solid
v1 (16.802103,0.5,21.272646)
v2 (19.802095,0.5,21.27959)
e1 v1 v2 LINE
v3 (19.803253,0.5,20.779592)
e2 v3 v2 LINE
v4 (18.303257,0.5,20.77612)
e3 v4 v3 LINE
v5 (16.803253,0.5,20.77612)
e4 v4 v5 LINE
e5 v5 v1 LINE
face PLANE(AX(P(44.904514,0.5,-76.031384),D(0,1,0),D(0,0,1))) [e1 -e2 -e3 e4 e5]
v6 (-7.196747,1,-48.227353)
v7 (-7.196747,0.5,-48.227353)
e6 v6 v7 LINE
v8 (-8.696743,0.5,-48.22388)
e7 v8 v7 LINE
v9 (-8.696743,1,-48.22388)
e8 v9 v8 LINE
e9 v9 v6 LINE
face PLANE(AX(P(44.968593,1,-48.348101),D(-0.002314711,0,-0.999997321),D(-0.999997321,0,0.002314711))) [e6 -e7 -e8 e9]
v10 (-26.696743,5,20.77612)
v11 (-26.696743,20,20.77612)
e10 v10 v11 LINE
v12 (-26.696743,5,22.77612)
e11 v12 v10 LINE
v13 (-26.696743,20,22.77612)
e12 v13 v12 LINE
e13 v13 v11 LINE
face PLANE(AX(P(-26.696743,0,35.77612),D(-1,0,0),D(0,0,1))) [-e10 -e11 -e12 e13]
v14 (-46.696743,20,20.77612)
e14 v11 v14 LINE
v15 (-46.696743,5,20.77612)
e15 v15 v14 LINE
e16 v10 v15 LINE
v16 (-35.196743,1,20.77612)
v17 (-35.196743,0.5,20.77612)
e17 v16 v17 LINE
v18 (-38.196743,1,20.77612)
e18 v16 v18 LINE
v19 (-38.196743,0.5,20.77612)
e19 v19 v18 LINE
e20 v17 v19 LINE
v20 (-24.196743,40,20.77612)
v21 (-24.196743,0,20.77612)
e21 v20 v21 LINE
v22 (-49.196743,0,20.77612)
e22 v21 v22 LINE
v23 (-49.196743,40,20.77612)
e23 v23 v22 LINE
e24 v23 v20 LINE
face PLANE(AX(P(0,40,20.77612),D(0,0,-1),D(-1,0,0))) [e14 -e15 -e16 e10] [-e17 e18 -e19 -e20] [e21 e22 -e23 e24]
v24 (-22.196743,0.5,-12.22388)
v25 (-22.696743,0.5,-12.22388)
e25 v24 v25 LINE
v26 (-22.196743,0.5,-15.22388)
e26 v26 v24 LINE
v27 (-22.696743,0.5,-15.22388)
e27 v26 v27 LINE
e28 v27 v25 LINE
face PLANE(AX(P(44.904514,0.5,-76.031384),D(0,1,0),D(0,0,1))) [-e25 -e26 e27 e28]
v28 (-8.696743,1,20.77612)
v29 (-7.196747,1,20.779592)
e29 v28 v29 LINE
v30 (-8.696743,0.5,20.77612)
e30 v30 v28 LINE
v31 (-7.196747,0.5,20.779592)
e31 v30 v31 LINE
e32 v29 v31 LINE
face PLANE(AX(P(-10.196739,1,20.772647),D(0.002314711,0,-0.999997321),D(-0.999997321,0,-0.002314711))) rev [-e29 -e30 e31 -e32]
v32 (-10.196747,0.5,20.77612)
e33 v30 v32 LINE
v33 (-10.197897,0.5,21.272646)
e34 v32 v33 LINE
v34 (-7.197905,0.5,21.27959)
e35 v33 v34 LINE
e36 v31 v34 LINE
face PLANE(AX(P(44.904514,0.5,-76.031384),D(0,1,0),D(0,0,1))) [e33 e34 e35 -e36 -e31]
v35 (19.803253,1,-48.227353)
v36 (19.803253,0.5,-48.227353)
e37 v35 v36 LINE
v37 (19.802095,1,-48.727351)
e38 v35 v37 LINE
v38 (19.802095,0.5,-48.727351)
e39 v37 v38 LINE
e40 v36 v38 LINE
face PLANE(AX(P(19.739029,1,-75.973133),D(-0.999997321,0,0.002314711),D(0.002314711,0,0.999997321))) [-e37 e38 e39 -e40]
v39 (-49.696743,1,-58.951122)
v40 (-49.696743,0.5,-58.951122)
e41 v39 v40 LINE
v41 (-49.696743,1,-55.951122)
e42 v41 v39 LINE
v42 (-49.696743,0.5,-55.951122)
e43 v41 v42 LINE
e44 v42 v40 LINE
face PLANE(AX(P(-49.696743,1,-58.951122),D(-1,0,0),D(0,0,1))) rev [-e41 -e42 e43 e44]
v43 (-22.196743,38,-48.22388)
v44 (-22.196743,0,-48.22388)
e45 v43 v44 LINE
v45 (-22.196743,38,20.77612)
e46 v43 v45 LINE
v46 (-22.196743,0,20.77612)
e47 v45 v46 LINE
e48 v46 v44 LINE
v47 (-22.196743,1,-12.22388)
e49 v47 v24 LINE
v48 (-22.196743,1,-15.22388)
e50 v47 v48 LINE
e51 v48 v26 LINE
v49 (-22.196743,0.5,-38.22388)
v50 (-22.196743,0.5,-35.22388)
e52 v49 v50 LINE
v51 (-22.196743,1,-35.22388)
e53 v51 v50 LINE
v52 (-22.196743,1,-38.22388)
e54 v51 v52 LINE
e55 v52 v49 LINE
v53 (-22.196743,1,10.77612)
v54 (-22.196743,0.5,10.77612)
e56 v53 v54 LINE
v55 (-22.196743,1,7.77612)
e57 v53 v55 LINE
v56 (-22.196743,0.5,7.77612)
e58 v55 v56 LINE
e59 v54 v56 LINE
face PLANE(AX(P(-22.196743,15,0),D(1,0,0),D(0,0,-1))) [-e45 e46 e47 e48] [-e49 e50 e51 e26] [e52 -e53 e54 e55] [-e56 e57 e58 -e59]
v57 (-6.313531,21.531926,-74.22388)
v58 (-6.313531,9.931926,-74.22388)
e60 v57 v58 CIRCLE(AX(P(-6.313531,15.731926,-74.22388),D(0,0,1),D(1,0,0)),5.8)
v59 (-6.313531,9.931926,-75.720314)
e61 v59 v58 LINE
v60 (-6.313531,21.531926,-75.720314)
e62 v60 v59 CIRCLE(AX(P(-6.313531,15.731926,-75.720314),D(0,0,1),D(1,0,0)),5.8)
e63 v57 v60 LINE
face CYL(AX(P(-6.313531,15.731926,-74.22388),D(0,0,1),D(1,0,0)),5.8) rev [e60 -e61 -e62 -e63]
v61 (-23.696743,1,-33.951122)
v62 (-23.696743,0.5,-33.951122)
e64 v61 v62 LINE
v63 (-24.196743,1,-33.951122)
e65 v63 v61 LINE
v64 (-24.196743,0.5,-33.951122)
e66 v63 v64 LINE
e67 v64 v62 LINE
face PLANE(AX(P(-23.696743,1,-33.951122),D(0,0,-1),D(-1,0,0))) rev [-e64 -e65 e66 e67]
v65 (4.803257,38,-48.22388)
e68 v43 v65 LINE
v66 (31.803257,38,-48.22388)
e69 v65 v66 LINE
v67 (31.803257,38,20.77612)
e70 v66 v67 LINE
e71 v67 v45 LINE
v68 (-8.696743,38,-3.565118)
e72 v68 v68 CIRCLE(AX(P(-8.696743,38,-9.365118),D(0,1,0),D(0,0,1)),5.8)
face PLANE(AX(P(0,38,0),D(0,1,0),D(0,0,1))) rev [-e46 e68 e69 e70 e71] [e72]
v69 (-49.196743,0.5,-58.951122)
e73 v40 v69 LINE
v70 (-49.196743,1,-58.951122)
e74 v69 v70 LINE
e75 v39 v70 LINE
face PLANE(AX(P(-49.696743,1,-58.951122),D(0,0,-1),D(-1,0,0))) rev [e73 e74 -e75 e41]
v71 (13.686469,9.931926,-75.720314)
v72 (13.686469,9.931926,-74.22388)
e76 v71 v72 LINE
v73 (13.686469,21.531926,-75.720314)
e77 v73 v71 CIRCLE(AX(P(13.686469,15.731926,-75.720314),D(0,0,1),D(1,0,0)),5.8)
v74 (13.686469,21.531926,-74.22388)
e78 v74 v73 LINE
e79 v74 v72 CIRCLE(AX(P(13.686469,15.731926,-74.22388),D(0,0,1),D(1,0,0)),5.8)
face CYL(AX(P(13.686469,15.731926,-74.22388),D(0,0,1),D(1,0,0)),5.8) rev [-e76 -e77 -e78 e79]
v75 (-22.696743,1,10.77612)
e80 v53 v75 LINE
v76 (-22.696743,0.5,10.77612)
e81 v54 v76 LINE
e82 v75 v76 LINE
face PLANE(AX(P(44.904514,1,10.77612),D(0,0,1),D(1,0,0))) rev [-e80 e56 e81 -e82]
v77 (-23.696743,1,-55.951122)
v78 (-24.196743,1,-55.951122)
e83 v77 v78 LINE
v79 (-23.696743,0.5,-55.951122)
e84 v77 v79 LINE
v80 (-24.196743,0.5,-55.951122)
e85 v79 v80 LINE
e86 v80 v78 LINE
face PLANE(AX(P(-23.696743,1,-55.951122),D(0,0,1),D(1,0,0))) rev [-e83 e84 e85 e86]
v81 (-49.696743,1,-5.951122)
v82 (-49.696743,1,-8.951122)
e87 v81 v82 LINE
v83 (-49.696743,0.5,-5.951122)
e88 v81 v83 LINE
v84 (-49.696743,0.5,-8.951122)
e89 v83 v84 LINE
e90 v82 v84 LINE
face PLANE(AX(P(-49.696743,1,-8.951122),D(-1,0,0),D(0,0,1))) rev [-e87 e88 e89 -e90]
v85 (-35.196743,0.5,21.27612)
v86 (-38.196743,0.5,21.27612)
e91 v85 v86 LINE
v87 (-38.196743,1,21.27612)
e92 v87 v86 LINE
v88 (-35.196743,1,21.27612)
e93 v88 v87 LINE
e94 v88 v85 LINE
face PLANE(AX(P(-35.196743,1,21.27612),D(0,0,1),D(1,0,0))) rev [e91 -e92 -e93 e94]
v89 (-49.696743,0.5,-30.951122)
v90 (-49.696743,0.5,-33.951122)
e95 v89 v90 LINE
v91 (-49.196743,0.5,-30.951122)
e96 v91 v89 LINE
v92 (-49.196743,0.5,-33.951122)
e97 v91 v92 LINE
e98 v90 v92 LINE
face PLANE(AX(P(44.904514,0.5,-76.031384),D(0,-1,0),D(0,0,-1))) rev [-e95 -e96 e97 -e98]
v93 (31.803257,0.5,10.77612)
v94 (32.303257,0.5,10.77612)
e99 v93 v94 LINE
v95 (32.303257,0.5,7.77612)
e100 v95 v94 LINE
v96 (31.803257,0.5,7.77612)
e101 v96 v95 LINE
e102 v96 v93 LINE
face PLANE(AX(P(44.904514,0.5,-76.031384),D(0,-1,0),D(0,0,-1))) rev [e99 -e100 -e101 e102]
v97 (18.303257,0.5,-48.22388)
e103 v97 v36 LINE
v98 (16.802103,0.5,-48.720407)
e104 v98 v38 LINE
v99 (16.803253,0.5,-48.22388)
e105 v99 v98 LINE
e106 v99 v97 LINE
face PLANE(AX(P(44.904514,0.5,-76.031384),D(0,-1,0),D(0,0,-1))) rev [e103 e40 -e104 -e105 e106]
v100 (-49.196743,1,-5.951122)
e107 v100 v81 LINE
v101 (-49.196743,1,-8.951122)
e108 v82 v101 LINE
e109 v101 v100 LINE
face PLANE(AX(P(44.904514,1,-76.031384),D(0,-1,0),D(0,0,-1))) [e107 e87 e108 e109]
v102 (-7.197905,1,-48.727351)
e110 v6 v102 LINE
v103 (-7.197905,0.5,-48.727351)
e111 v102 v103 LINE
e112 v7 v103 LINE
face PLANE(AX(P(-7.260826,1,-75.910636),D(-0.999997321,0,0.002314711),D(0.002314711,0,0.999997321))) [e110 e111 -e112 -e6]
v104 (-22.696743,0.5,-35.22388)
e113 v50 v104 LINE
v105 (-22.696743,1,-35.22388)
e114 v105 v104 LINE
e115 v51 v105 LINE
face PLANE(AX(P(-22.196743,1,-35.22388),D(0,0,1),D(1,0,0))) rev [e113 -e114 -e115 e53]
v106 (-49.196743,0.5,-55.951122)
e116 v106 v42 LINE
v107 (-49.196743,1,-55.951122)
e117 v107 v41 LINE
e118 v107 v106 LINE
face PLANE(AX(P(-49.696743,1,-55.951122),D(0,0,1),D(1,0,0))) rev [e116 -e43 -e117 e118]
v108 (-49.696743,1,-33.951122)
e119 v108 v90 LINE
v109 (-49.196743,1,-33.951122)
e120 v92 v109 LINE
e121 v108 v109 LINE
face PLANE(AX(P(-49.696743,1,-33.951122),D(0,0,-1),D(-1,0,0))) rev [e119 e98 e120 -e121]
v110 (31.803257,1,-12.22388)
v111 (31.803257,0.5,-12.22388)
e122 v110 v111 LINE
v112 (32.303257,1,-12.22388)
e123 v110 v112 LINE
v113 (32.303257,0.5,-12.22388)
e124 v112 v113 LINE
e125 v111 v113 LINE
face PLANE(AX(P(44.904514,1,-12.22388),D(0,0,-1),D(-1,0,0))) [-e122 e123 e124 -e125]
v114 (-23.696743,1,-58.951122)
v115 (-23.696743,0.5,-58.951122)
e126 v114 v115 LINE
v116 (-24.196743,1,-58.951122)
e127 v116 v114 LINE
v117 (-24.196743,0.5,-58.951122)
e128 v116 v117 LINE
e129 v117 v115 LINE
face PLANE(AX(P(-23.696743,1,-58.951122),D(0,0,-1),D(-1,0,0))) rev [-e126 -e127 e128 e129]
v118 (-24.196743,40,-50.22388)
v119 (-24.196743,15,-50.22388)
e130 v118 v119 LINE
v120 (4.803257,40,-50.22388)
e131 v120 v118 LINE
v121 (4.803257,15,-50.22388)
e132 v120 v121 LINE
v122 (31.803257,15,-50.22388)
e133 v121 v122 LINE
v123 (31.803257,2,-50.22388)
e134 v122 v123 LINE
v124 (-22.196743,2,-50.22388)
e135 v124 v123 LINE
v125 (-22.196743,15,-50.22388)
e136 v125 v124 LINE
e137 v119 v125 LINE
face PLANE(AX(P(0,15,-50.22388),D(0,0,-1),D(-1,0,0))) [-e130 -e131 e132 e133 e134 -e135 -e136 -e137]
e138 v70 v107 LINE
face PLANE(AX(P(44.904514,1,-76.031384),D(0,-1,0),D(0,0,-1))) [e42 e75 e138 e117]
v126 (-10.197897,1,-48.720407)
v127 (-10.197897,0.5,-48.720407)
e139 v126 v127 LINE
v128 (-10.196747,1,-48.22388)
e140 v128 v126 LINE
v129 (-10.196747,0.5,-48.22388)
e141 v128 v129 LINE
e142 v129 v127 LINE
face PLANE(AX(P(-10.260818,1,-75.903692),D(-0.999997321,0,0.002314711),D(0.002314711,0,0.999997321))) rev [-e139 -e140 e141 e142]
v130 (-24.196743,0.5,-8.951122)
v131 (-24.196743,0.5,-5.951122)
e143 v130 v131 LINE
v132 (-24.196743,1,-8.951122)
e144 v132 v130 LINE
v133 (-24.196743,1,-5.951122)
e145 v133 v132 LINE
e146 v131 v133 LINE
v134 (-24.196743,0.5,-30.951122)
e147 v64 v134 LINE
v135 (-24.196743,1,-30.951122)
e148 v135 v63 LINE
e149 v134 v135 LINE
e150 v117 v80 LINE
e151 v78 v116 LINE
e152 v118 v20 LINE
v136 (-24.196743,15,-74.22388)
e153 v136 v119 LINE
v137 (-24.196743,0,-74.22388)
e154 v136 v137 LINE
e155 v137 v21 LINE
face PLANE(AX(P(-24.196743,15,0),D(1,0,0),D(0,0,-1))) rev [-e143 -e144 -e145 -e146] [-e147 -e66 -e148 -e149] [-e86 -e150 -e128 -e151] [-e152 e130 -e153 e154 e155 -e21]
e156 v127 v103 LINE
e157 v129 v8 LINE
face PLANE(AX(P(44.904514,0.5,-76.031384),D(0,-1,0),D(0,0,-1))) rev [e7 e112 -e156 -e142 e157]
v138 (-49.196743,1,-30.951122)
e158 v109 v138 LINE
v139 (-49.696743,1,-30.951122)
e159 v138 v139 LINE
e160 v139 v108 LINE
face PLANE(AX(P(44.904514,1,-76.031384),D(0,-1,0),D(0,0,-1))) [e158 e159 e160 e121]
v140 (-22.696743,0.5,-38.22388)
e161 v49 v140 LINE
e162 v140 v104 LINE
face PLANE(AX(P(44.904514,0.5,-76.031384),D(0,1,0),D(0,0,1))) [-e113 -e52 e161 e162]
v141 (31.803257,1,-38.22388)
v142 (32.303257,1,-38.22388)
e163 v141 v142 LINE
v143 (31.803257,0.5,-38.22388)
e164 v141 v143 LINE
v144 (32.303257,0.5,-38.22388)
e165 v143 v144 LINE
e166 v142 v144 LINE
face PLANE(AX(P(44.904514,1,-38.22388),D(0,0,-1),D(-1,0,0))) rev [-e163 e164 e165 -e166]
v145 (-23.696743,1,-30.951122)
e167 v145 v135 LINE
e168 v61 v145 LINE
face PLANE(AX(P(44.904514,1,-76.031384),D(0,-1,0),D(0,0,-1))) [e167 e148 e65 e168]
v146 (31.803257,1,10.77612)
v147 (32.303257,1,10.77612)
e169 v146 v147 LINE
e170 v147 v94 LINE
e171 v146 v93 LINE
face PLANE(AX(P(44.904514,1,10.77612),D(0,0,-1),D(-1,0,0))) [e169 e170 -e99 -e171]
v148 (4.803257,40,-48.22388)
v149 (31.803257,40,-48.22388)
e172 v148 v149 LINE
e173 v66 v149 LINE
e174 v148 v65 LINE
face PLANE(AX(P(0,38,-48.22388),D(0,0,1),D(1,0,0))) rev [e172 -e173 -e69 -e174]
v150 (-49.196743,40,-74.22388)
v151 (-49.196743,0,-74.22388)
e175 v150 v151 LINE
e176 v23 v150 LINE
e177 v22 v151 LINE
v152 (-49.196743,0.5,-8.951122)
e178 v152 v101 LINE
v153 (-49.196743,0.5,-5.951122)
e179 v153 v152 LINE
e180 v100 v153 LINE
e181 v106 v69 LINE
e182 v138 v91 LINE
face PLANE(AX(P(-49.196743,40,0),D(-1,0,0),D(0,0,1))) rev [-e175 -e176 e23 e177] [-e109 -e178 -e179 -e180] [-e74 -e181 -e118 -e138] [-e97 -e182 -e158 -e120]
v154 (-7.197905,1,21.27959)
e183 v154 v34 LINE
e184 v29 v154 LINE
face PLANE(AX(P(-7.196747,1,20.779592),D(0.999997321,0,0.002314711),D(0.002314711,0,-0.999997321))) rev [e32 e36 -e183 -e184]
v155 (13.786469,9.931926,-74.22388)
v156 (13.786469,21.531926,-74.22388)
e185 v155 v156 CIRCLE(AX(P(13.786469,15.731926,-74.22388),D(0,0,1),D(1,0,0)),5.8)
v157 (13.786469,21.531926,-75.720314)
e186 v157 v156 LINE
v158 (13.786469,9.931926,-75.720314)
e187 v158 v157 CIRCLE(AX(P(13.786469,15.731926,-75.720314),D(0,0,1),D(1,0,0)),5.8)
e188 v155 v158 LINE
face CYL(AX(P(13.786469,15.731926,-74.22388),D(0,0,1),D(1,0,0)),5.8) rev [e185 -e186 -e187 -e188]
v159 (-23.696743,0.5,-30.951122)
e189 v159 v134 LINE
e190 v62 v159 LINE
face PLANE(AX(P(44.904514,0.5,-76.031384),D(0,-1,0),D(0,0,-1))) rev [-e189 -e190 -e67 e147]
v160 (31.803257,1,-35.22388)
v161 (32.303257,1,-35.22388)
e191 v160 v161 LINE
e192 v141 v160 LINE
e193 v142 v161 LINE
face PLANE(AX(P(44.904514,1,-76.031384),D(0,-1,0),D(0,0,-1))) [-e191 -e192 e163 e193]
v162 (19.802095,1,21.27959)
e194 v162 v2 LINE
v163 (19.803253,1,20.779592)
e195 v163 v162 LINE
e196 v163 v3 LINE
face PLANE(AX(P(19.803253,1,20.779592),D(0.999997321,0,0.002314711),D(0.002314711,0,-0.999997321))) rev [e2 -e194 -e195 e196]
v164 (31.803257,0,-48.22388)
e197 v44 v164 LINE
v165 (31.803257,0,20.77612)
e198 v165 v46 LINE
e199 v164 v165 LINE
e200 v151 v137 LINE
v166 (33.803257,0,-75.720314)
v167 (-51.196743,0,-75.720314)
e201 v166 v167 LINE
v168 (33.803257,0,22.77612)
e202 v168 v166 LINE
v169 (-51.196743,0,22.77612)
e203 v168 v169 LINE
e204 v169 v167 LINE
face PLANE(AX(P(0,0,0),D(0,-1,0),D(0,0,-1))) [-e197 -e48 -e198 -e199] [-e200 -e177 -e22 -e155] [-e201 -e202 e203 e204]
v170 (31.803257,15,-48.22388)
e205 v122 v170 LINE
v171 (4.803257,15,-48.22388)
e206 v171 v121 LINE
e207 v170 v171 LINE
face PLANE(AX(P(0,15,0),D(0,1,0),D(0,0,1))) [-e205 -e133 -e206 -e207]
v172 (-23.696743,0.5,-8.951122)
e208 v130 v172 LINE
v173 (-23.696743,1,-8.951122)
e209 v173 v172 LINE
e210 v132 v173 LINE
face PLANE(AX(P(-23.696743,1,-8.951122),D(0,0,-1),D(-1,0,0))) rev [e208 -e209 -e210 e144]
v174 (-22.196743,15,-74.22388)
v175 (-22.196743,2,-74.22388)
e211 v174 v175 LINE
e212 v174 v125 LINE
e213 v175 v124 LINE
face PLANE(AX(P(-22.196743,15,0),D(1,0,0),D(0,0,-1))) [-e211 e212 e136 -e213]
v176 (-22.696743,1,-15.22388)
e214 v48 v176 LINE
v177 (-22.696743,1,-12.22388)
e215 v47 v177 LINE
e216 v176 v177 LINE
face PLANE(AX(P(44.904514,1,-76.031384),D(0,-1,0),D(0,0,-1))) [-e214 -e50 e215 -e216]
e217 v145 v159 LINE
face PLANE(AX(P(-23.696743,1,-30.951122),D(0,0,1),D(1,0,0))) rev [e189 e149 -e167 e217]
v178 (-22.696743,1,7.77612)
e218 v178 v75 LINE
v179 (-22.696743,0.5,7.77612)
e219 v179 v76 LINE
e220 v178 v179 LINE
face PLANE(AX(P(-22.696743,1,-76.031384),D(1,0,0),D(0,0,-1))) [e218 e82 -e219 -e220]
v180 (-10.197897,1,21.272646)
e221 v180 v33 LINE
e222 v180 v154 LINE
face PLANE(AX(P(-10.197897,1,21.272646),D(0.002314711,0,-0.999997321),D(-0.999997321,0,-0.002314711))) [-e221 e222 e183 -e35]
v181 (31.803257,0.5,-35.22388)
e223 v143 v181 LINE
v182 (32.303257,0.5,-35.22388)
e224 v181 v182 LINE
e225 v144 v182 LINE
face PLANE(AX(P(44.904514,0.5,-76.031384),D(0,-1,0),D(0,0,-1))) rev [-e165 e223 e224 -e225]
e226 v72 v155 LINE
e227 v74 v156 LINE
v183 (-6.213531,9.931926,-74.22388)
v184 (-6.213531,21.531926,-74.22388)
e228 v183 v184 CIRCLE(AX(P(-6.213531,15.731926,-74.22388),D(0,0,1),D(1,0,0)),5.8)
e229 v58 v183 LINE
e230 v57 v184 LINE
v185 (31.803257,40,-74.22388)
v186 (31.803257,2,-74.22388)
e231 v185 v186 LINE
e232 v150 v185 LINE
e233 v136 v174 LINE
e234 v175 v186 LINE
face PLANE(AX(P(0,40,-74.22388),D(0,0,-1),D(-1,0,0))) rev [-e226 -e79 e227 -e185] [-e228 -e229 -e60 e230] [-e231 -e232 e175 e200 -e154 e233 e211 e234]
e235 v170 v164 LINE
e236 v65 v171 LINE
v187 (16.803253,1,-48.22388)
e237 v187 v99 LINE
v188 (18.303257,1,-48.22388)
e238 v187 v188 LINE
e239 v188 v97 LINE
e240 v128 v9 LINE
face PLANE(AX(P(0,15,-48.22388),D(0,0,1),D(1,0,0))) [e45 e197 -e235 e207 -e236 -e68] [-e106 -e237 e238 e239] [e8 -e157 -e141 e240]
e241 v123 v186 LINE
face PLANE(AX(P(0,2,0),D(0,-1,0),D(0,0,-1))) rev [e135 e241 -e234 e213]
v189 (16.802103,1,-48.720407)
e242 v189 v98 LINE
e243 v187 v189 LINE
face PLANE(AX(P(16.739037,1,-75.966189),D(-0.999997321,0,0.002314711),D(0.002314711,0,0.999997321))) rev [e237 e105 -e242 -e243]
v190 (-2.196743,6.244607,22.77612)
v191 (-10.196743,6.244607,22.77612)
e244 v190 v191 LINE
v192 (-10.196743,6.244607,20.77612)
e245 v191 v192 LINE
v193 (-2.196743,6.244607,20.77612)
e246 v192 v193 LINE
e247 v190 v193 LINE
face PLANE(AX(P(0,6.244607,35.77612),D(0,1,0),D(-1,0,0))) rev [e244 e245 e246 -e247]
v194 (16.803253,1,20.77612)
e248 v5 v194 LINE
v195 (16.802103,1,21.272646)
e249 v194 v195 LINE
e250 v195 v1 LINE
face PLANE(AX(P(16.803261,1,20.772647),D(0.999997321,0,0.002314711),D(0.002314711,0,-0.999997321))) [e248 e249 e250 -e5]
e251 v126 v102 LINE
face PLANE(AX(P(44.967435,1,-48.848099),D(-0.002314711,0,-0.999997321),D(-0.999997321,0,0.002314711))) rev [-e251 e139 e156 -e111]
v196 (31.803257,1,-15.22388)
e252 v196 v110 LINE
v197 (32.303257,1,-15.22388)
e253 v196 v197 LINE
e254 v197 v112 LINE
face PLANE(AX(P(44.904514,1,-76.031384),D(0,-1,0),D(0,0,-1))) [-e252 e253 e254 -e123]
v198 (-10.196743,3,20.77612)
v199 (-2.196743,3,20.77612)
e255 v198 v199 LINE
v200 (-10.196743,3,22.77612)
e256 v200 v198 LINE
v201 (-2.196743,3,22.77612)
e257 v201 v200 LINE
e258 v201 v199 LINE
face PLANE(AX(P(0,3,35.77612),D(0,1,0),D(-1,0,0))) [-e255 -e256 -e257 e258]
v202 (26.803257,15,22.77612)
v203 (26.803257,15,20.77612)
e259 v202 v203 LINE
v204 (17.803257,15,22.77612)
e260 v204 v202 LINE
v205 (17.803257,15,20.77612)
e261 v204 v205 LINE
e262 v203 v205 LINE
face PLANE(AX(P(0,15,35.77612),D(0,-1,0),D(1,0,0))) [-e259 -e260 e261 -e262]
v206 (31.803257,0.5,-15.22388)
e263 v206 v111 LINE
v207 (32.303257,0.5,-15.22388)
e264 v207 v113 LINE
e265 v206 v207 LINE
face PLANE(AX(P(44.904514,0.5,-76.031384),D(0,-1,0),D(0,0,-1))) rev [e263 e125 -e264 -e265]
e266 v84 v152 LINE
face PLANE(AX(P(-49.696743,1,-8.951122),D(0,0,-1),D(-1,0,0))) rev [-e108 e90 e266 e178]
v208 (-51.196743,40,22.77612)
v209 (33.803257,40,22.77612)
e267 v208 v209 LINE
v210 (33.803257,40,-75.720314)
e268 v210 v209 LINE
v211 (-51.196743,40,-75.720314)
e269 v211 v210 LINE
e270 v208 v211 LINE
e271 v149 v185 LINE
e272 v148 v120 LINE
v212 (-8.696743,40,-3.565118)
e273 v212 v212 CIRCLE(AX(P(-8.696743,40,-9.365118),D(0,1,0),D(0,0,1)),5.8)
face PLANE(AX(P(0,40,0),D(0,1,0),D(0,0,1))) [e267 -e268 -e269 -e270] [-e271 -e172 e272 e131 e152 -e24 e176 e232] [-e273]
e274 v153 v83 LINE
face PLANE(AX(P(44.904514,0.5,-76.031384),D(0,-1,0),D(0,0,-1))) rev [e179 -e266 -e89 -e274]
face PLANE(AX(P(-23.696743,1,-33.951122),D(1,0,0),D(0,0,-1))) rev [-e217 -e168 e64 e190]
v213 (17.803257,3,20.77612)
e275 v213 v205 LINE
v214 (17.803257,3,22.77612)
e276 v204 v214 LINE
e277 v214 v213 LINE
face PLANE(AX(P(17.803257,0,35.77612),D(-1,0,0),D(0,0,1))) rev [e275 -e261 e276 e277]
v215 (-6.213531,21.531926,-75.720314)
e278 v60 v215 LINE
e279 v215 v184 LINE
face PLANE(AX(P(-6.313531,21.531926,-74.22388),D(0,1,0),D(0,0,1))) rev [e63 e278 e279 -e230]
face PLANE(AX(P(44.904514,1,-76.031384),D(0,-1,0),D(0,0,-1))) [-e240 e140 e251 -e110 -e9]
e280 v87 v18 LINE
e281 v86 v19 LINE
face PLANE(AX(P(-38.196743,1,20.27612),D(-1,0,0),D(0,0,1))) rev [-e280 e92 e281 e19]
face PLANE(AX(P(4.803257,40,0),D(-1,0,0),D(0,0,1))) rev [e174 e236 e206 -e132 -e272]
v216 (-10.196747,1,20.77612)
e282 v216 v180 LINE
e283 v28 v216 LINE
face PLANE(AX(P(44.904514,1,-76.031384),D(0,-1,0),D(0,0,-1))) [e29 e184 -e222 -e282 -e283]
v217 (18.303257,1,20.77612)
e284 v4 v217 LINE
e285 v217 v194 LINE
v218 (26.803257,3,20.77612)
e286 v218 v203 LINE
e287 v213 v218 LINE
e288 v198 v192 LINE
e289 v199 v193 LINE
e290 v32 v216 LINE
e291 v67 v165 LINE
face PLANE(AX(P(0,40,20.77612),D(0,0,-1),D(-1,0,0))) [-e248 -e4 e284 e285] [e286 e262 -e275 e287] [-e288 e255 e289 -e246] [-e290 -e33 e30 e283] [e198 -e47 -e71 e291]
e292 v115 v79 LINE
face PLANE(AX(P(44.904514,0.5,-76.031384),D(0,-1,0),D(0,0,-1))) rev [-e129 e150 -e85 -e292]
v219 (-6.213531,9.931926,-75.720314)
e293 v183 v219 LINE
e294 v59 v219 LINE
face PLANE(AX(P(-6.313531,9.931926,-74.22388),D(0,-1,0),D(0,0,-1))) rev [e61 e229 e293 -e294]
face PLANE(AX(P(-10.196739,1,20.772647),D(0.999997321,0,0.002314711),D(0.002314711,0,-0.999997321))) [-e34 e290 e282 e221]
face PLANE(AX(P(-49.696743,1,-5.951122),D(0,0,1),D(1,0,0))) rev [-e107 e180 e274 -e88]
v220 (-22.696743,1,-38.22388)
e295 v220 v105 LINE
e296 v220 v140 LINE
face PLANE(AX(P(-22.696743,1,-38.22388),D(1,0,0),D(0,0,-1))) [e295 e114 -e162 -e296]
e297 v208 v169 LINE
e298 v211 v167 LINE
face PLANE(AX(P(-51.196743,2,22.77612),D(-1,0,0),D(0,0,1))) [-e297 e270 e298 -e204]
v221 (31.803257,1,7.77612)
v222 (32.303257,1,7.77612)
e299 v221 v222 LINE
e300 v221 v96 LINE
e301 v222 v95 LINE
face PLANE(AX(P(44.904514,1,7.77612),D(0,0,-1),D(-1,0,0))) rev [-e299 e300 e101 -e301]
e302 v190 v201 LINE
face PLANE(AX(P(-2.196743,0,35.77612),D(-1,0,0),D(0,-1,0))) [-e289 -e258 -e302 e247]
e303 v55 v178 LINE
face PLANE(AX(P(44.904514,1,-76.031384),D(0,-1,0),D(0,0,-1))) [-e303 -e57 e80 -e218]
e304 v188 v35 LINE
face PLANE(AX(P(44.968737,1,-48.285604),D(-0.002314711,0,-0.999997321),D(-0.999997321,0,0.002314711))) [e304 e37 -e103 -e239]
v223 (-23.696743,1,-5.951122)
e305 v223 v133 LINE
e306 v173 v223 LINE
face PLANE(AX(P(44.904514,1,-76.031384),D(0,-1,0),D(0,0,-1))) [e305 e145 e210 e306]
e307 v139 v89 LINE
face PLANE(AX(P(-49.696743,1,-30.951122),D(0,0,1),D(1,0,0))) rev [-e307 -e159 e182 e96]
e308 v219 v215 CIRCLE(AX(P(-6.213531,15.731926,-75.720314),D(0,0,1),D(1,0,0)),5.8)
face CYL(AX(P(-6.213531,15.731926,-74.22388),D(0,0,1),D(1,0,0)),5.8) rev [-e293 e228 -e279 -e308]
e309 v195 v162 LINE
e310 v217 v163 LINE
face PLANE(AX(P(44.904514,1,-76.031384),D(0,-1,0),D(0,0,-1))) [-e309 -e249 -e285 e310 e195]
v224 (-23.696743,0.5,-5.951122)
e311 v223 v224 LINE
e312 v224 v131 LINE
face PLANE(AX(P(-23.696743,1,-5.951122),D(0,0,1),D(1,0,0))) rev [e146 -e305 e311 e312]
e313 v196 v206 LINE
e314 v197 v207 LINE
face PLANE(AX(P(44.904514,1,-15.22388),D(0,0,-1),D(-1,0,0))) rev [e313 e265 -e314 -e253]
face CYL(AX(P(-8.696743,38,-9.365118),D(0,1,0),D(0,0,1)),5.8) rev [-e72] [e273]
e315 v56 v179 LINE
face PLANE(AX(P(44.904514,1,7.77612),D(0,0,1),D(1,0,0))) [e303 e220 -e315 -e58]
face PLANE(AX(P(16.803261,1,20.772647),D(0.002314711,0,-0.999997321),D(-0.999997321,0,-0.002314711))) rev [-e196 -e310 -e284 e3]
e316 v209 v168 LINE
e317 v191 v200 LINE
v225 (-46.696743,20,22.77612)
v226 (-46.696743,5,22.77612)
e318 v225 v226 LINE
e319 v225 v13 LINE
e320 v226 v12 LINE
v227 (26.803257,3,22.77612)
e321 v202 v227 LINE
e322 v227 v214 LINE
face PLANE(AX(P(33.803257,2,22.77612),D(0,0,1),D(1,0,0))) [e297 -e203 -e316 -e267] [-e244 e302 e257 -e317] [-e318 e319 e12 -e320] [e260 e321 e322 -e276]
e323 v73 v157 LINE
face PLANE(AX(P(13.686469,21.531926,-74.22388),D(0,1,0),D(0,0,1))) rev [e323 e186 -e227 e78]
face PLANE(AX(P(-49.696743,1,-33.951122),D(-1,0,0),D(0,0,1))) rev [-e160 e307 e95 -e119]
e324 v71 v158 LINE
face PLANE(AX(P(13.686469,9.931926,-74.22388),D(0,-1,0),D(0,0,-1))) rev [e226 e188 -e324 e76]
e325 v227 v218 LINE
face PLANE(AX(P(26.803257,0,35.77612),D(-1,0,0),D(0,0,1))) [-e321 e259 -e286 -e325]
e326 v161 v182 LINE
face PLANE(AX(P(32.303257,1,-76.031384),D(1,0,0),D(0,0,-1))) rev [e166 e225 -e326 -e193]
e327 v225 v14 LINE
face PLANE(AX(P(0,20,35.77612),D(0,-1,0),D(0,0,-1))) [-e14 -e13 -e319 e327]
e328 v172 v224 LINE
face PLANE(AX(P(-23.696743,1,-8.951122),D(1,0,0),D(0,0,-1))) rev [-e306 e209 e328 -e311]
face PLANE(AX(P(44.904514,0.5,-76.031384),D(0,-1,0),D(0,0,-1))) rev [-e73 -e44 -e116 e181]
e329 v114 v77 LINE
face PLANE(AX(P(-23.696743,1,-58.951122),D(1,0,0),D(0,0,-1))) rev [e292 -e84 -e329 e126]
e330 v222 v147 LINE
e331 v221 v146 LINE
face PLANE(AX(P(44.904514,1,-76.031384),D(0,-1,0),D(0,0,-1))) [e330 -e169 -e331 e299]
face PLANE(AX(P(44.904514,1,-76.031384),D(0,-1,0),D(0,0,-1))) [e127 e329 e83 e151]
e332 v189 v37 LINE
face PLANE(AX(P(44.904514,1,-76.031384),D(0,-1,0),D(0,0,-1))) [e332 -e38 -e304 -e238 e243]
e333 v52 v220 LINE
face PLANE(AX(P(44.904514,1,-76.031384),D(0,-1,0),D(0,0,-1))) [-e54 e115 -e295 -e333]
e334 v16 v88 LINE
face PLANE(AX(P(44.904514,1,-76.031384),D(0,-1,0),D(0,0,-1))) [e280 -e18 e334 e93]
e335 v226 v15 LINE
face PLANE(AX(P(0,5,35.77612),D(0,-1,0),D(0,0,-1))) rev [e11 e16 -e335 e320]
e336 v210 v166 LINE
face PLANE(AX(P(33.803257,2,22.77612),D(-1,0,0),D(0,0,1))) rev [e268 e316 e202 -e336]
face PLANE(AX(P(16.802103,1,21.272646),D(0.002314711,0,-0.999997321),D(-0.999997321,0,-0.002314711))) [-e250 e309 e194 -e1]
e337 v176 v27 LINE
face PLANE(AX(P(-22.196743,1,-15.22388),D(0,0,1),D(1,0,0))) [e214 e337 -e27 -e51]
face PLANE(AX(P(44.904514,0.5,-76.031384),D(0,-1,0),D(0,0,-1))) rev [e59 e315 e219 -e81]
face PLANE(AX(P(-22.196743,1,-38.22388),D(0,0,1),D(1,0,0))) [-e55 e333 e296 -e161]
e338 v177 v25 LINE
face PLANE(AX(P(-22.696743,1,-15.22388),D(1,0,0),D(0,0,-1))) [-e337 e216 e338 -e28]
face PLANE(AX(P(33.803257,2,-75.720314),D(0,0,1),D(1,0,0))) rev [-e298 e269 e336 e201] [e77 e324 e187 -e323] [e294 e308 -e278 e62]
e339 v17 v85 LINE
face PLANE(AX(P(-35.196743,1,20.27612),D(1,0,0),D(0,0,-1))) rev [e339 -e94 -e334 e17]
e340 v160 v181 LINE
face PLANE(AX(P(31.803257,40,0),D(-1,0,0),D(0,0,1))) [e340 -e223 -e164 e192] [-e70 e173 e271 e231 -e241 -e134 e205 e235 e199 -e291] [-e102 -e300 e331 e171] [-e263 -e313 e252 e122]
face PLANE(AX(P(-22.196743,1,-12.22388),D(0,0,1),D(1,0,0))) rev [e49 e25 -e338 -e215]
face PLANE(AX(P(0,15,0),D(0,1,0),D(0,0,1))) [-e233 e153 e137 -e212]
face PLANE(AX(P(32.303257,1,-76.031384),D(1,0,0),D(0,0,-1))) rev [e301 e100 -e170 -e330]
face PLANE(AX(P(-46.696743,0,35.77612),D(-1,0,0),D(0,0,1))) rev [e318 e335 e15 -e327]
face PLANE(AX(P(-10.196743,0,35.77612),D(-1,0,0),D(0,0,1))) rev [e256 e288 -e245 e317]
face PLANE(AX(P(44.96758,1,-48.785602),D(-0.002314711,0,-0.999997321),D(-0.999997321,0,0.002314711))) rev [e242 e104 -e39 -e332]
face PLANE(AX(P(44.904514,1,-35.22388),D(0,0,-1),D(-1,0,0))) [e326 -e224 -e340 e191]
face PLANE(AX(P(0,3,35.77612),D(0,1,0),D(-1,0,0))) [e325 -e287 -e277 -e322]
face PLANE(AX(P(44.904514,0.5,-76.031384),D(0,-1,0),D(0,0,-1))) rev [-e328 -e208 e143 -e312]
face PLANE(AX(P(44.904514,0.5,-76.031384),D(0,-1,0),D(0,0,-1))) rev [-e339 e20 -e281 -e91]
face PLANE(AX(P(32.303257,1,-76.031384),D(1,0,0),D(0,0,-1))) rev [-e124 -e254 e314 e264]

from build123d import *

# Parameters (mm, degrees)
SKETCH_1_W                   = 85
SKETCH_1_H                   = 98.49643328
EXTRUDE_1_DEPTH              = 2
SKETCH_1_6_W                 = 2
SKETCH_1_6_H                 = 95
EXTRUDE_2_DEPTH              = 40
SKETCH_1_7_W                 = 54
SKETCH_1_7_H                 = 2
BOSS_EXTRUDE1_DEPTH          = 15
F_10_0_START                 = -75.720313778
F_10_0_MM_DOWEL_HOLES1_DEPTH = 1.49643328
SKETCH5_W                    = 9
SKETCH5_H                    = 12
SKETCH5_W_2                  = 8
SKETCH5_H_2                  = 3.244606683
SKETCH5_W_3                  = 20
SKETCH5_H_3                  = 15
CUT_EXTRUDE1_DEPTH           = 15
SKETCH8_W                    = 25
SKETCH8_H                    = 95
SKETCH8_W_2                  = 54
SKETCH8_H_2                  = 69
CUT_EXTRUDE2_DEPTH           = 10
BOSS_EXTRUDE2_DEPTH          = 25
SKETCH11_R                   = 5.8
BOSS_EXTRUDE3_DEPTH          = 2
CAVITY1_START                = -49.696743418
CAVITY1_OUTLINE_W            = 0.5
CAVITY1_OUTLINE_H            = 3
CAVITY1_DEPTH                = 26
CAVITY1_START_2              = -38.196743418
CAVITY1_2_OUTLINE_W          = 0.5
CAVITY1_2_OUTLINE_H          = 0.5
CAVITY1_2_DEPTH              = 3
CAVITY2_START                = 0.5
CAVITY2_OUTLINE_W            = 0.5
CAVITY2_OUTLINE_H            = 3
CAVITY2_DEPTH                = 0.5


# Read off the part's stored shape, not the designer's step: Ø10.0 mm Dowel Holes1, Cavity1, Cavity2
with BuildPart() as part:
    # ｽｹｯﾁ1 → ﾎﾞｽ - 押し出し1 (new body)
    with BuildSketch(Plane(origin=(0, 0, 0), x_dir=(1, 0, 0), z_dir=(0, 1, 0))):
        with Locations((-8.696743418, 26.472097138)):
            Rectangle(SKETCH_1_W, SKETCH_1_H)
    extrude(amount=EXTRUDE_1_DEPTH)

    # ｽｹｯﾁ1<6> → ﾎﾞｽ - 押し出し2 (add)
    with BuildSketch(Plane(origin=(0, 0, 0), x_dir=(1, 0, 0), z_dir=(0, 1, 0))):
        with Locations((-50.196743418, 26.723880498)):
            Rectangle(SKETCH_1_6_W, SKETCH_1_6_H)
        Polygon((33.803256582, -20.776119502), (31.803256582, -20.776119502), (-22.196743418, -20.776119502), (-24.196743418, -20.776119502), (-49.196743418, -20.776119502), (-51.196743418, -20.776119502), (-51.196743418, -22.776119502), (33.803256582, -22.776119502), align=None)
        Polygon((-22.196743418, 74.223880498), (31.803256582, 74.223880498), (31.803256582, 75.720313778), (-51.196743418, 75.720313778), (-51.196743418, 74.223880498), (-49.196743418, 74.223880498), (-24.196743418, 74.223880498), align=None)
        Polygon((31.803256582, 50.223880498), (31.803256582, 48.223880498), (31.803256582, -20.776119502), (33.803256582, -20.776119502), (33.803256582, 75.720313778), (31.803256582, 75.720313778), (31.803256582, 74.223880498), align=None)
    extrude(amount=EXTRUDE_2_DEPTH)

    # ｽｹｯﾁ1<7> → Boss-Extrude1 (add)
    with BuildSketch(Plane(origin=(0, 0, 0), x_dir=(1, 0, 0), z_dir=(0, 1, 0))):
        with Locations((4.803256582, 49.223880498)):
            Rectangle(SKETCH_1_7_W, SKETCH_1_7_H)
        Polygon((-22.196743418, -20.776119502), (-22.196743418, 48.223880498), (-22.196743418, 50.223880498), (-22.196743418, 74.223880498), (-24.196743418, 74.223880498), (-24.196743418, -20.776119502), align=None)
    extrude(amount=BOSS_EXTRUDE1_DEPTH)

    # Ø10.0 mm Dowel Holes1 outline → Ø10.0 mm Dowel Holes1 (cut)
    with BuildSketch(Plane.XY.offset(F_10_0_START)):
        with BuildLine():
            Line((-6.31353142, 9.931926182), (-6.21353142, 9.931926182))
            ThreePointArc((-6.21353142, 9.931926182), (-0.41353142, 15.731926182), (-6.21353142, 21.531926182))
            Line((-6.21353142, 21.531926182), (-6.31353142, 21.531926182))
            ThreePointArc((-6.31353142, 21.531926182), (-12.11353142, 15.731926182), (-6.31353142, 9.931926182))
        make_face()
        with BuildLine():
            ThreePointArc((13.78646858, 9.931926182), (19.58646858, 15.731926182), (13.78646858, 21.531926182))
            Line((13.78646858, 21.531926182), (13.68646858, 21.531926182))
            ThreePointArc((13.68646858, 21.531926182), (7.88646858, 15.731926182), (13.68646858, 9.931926182))
            Line((13.68646858, 9.931926182), (13.78646858, 9.931926182))
        make_face()
    extrude(amount=F_10_0_MM_DOWEL_HOLES1_DEPTH, mode=Mode.SUBTRACT)

    # Sketch5 → Cut-Extrude1 (cut)
    with BuildSketch(Plane(origin=(0, 0, 20.776119502), x_dir=(-1, 0, 0), z_dir=(0, 0, -1))):
        with Locations((-22.303256582, 9)):
            Rectangle(SKETCH5_W, SKETCH5_H)
        with Locations((6.196743418, 4.622303342)):
            Rectangle(SKETCH5_W_2, SKETCH5_H_2)
        with Locations((36.696743418, 12.5)):
            Rectangle(SKETCH5_W_3, SKETCH5_H_3)
    extrude(amount=-CUT_EXTRUDE1_DEPTH, mode=Mode.SUBTRACT)

    # Sketch8 → Cut-Extrude2 (cut)
    with BuildSketch(Plane(origin=(0, 2, 0), x_dir=(1, 0, 0), z_dir=(0, 1, 0))):
        with Locations((-36.696743418, 26.723880498)):
            Rectangle(SKETCH8_W, SKETCH8_H)
        with Locations((4.803256582, 13.723880498)):
            Rectangle(SKETCH8_W_2, SKETCH8_H_2)
    extrude(amount=-CUT_EXTRUDE2_DEPTH, mode=Mode.SUBTRACT)



with BuildPart() as body_2:
    # Sketch9 → Boss-Extrude2 (new body)
    with BuildSketch(Plane(origin=(0, 15, 0), x_dir=(1, 0, 0), z_dir=(0, 1, 0))):
        Polygon((-22.196743418, -20.776119502), (-22.196743418, 48.223880498), (4.803256582, 48.223880498), (4.803256582, 50.223880498), (-24.196743418, 50.223880498), (-24.196743418, -20.776119502), align=None)
    extrude(amount=BOSS_EXTRUDE2_DEPTH)


with BuildPart() as part_1:
    add(part.part)

    add(body_2.part)  # Boss-Extrude3 merges body 2
    # Sketch11 → Boss-Extrude3 (add)
    with BuildSketch(Plane(origin=(0, 40, 0), x_dir=(1, 0, 0), z_dir=(0, 1, 0))):
        Polygon((31.803256582, 48.223880498), (-22.196743418, 48.223880498), (-22.196743418, 9.365118158), (-22.196743418, -20.776119502), (31.803256582, -20.776119502), align=None)
        with Locations(Location((-8.696743418, 9.365118158, 0), (0, 0, 270))):
            Circle(SKETCH11_R, mode=Mode.SUBTRACT)
    extrude(amount=-BOSS_EXTRUDE3_DEPTH)

    # Cavity1 outline → Cavity1 (cut)
    with BuildSketch(Plane.YZ.offset(CAVITY1_START)):
        with Locations((0.75, -7.451121589)):
            Rectangle(CAVITY1_OUTLINE_W, CAVITY1_OUTLINE_H)
        with Locations((0.75, -32.451121589)):
            Rectangle(CAVITY1_OUTLINE_W, CAVITY1_OUTLINE_H)
        with Locations((0.75, -57.451121589)):
            Rectangle(CAVITY1_OUTLINE_W, CAVITY1_OUTLINE_H)
    extrude(amount=CAVITY1_DEPTH, mode=Mode.SUBTRACT)

    # Cavity1 2 outline → Cavity1 2 (cut)
    with BuildSketch(Plane.YZ.offset(CAVITY1_START_2)):
        with Locations((0.75, 21.026119502)):
            Rectangle(CAVITY1_2_OUTLINE_W, CAVITY1_2_OUTLINE_H)
    extrude(amount=CAVITY1_2_DEPTH, mode=Mode.SUBTRACT)

    # Cavity2 outline → Cavity2 (cut)
    with BuildSketch(Plane(origin=(0, 0, 0), x_dir=(1, 0, 0), z_dir=(0, 1, 0)).offset(CAVITY2_START)):
        Polygon((-7.196747436, 48.227352565), (-7.197904792, 48.727351226), (-10.197896755, 48.720407091), (-10.196747436, 48.223880498), (-8.696743418, 48.223880498), align=None)
        Polygon((16.802103245, 48.720407091), (16.803252564, 48.223880498), (18.303256582, 48.223880498), (19.803252564, 48.227352565), (19.802095208, 48.727351226), align=None)
        with Locations((-22.446743418, 36.723880498)):
            Rectangle(CAVITY2_OUTLINE_W, CAVITY2_OUTLINE_H)
        with Locations((32.053256582, 36.723880498)):
            Rectangle(CAVITY2_OUTLINE_W, CAVITY2_OUTLINE_H)
        with Locations((-22.446743418, 13.723880498)):
            Rectangle(CAVITY2_OUTLINE_W, CAVITY2_OUTLINE_H)
        with Locations((32.053256582, 13.723880498)):
            Rectangle(CAVITY2_OUTLINE_W, CAVITY2_OUTLINE_H)
        with Locations((-22.446743418, -9.276119502)):
            Rectangle(CAVITY2_OUTLINE_W, CAVITY2_OUTLINE_H)
        with Locations((32.053256582, -9.276119502)):
            Rectangle(CAVITY2_OUTLINE_W, CAVITY2_OUTLINE_H)
        Polygon((-8.696743418, -20.776119502), (-10.196747436, -20.776119502), (-10.197896755, -21.272646095), (-7.197904792, -21.27959023), (-7.196747436, -20.779591569), align=None)
        Polygon((19.803252564, -20.779591569), (18.303256578, -20.776119502), (16.803252564, -20.776119502), (16.802103245, -21.272646095), (19.802095208, -21.27959023), align=None)
    extrude(amount=CAVITY2_DEPTH, mode=Mode.SUBTRACT)


solid = part_1.part
